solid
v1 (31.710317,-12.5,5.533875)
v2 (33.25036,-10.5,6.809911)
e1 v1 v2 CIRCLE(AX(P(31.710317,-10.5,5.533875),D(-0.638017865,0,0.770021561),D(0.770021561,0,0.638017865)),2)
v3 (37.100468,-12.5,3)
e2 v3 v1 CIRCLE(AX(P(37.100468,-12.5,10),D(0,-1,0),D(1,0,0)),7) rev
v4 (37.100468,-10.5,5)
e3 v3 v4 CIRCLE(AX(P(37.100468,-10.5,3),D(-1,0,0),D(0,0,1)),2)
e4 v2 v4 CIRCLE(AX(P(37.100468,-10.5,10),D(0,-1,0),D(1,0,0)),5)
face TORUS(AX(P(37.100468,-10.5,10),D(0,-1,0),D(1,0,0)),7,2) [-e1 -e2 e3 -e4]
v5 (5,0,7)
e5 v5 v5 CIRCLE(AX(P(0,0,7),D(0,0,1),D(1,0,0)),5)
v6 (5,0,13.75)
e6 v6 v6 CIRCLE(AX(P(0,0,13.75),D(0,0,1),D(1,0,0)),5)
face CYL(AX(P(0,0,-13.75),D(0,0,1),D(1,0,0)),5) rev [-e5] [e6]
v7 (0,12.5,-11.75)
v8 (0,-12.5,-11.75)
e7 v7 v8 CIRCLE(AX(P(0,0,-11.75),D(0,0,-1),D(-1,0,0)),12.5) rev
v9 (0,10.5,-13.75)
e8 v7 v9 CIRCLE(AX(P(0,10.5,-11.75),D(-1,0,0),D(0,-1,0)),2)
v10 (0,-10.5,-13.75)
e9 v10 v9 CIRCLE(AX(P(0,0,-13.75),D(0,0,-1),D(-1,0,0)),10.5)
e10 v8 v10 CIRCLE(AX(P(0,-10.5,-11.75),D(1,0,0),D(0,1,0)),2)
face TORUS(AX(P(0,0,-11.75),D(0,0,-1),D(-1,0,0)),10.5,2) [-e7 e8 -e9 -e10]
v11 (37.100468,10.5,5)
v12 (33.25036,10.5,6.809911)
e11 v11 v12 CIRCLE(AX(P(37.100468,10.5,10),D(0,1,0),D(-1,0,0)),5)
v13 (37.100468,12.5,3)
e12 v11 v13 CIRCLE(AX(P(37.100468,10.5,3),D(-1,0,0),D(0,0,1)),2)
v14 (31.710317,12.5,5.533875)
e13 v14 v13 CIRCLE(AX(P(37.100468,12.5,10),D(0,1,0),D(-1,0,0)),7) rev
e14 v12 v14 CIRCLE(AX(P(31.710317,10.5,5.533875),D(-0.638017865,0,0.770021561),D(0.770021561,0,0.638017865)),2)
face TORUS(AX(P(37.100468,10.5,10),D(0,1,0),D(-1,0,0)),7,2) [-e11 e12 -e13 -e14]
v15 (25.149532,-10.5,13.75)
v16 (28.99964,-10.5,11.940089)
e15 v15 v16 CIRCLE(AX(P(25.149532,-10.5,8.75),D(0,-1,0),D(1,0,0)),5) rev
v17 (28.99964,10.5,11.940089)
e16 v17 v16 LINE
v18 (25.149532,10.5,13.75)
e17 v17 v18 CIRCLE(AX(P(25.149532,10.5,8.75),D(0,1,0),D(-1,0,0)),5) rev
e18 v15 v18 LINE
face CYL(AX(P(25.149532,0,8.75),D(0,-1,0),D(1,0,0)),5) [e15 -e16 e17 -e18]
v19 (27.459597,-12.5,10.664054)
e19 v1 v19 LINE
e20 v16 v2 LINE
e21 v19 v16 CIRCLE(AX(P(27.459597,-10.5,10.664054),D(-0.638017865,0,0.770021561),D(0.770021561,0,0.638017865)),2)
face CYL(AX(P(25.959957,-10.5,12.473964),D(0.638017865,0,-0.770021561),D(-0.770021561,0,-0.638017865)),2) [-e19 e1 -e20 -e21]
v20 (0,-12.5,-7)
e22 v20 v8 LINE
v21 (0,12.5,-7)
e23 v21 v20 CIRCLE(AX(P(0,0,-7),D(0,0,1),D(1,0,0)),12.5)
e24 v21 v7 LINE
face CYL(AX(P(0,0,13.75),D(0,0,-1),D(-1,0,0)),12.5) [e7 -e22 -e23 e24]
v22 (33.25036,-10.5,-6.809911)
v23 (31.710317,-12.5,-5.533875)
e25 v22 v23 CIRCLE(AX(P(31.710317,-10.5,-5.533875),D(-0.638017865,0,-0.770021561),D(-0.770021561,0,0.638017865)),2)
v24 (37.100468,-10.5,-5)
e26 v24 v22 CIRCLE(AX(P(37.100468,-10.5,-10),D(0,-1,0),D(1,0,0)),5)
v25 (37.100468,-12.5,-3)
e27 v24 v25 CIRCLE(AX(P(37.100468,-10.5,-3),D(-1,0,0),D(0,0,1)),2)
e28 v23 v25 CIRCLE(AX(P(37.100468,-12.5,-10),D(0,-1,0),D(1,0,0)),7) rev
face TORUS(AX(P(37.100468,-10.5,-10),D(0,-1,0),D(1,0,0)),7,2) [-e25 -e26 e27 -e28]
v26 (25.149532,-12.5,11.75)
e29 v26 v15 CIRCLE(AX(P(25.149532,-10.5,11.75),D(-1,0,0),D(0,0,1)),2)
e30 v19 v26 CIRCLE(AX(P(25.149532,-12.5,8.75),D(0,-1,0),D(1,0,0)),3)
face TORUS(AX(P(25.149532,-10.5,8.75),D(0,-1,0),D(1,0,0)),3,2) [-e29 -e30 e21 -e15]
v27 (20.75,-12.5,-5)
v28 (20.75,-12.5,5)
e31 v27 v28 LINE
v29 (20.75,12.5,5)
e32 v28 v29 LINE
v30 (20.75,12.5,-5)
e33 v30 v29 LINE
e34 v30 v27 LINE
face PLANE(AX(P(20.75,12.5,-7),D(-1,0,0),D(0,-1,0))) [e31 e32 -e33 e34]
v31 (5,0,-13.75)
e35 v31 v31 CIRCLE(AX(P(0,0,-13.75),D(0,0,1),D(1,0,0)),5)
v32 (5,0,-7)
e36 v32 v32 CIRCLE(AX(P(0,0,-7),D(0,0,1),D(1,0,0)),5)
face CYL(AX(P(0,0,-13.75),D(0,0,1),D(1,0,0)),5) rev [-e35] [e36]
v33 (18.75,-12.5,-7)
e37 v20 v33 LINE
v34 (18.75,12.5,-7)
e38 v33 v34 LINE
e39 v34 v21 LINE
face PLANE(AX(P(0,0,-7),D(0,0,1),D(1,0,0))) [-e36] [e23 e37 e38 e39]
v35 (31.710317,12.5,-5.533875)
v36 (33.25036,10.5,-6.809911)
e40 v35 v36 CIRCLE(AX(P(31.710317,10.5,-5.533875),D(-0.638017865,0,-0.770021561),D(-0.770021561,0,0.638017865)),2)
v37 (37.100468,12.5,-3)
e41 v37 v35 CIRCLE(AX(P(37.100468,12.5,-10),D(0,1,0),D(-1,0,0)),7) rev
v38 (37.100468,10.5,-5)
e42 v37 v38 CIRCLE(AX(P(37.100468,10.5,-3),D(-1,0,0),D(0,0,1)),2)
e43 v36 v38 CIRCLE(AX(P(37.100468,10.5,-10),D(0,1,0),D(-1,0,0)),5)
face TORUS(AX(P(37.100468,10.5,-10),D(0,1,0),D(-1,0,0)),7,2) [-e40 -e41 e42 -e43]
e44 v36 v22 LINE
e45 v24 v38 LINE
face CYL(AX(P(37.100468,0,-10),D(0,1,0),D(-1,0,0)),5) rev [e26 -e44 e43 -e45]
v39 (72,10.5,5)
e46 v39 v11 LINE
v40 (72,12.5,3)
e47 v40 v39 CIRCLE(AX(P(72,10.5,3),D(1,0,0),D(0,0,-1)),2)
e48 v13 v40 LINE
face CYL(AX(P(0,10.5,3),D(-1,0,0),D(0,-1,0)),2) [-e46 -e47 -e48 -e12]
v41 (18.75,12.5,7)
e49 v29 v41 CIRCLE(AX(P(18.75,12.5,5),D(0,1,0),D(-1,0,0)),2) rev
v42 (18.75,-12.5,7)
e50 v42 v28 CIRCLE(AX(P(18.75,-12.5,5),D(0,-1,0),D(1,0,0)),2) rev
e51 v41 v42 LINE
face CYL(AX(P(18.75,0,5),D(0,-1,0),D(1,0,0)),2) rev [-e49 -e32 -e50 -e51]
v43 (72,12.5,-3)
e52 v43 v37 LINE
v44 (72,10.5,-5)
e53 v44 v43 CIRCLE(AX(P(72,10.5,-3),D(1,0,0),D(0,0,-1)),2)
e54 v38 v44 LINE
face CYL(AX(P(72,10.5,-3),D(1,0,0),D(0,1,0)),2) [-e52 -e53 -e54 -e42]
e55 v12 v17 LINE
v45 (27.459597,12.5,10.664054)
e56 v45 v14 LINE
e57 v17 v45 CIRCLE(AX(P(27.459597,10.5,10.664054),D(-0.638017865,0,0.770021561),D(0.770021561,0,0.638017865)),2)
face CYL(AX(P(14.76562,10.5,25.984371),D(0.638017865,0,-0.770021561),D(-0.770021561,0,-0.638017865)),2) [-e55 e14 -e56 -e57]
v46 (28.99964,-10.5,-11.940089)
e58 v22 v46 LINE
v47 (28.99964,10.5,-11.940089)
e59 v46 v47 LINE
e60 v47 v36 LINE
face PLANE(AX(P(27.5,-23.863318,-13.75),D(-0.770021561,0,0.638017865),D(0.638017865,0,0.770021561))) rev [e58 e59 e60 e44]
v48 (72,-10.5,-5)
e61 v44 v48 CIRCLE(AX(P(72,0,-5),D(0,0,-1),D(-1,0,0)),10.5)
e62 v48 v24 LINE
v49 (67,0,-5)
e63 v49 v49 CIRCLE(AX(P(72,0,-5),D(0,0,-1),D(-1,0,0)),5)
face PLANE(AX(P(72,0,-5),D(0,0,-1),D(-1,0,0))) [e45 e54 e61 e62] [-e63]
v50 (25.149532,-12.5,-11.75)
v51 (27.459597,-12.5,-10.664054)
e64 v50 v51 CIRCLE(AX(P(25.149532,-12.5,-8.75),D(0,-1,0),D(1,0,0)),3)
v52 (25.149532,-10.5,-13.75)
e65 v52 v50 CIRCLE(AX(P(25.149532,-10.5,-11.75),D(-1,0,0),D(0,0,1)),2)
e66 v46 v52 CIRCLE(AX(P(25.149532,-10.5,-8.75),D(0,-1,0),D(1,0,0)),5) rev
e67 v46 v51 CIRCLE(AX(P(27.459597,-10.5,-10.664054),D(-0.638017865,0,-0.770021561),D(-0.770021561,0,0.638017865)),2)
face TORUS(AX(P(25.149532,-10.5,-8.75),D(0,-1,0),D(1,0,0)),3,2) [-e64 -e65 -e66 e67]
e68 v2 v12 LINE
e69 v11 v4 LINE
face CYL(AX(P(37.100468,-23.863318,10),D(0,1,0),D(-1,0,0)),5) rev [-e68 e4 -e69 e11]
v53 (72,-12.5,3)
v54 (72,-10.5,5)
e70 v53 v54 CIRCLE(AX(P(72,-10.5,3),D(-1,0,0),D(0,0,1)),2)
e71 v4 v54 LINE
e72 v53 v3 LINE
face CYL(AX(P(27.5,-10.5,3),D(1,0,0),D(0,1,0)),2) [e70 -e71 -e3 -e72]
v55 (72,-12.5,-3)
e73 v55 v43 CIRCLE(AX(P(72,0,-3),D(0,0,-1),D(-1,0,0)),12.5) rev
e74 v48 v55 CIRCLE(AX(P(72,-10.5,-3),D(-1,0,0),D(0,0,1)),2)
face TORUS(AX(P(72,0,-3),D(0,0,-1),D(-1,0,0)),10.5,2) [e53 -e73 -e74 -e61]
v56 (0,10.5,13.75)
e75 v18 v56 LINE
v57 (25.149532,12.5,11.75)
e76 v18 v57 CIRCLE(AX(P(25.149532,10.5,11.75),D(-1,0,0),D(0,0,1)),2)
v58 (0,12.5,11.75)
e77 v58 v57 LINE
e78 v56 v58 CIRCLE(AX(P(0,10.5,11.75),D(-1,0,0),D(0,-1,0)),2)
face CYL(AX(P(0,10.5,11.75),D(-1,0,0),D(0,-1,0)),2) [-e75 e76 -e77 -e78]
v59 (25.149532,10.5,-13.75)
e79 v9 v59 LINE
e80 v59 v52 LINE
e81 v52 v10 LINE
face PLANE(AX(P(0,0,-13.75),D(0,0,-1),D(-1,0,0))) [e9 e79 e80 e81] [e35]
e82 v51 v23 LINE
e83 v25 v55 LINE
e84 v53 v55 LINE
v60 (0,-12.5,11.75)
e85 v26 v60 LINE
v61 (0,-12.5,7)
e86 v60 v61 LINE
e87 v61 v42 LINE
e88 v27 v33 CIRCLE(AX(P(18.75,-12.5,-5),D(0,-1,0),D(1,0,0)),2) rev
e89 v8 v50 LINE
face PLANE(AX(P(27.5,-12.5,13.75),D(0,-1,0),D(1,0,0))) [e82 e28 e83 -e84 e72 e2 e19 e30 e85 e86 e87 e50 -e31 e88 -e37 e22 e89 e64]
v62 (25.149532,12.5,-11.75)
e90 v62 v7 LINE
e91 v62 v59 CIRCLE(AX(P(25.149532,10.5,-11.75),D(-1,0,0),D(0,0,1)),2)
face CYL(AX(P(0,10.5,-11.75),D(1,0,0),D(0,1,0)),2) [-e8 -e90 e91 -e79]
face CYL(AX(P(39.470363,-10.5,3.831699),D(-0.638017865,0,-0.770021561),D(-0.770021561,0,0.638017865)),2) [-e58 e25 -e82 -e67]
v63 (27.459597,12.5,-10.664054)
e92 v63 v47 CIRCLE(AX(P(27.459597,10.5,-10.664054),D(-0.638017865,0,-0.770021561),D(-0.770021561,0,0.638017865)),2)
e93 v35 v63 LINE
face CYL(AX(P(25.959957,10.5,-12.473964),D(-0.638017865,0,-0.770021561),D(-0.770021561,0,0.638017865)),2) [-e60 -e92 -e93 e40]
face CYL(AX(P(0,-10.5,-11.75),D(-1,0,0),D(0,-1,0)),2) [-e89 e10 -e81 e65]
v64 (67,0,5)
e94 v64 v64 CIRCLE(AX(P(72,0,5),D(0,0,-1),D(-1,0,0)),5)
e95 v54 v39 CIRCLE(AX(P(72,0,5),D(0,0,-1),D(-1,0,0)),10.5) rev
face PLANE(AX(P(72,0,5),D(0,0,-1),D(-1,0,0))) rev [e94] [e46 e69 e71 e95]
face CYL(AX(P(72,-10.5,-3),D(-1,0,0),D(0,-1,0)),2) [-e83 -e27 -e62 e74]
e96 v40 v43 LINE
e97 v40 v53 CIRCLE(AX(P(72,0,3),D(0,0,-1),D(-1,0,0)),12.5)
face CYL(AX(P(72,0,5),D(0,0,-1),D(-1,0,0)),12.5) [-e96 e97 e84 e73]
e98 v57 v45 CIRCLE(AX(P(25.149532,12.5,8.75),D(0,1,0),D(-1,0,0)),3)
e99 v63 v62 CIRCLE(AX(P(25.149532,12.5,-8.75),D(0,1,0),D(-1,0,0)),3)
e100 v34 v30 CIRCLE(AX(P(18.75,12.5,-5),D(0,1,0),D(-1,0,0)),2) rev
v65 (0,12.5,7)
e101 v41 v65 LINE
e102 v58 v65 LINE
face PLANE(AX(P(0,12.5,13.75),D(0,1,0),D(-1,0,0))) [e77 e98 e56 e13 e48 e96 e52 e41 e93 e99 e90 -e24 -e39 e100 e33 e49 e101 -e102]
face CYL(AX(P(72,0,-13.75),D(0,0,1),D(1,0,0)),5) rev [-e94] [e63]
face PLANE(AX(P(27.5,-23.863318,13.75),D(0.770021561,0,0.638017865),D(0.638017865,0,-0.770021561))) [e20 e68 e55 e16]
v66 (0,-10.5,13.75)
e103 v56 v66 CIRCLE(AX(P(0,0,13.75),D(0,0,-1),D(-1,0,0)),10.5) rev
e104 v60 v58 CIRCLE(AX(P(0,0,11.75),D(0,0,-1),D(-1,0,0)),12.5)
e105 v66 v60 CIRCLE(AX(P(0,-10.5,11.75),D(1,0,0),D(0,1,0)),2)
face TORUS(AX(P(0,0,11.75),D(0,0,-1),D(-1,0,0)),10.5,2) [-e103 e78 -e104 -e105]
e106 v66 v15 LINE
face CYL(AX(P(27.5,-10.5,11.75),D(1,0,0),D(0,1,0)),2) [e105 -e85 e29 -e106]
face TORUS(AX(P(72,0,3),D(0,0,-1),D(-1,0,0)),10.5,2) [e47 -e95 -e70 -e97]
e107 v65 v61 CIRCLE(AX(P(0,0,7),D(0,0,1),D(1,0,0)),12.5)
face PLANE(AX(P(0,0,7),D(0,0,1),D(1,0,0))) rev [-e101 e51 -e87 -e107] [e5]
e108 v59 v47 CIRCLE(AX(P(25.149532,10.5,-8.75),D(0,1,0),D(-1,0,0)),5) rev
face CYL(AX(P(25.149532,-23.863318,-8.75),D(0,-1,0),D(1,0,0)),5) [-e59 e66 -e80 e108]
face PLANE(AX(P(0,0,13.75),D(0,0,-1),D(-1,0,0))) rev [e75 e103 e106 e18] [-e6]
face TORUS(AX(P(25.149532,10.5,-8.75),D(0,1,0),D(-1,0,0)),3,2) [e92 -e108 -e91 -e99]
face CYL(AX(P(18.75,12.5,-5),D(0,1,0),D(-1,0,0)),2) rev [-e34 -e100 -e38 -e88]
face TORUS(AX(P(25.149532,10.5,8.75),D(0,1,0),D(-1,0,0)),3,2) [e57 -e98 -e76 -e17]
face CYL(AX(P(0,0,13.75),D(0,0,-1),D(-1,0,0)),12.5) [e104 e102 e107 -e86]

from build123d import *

# Parameters (mm, degrees)
BASE_EXTRUDE_DEPTH  = 13.75
CUT_EXTRUDE1_DEPTH  = 7
BOSS_EXTRUDE1_DEPTH = 5
BOSS_EXTRUDE2_START = -25
BOSS_EXTRUDE2_DEPTH = 25
HOLE1_START         = -13.75
HOLE1_OUTLINE_R     = 5
HOLE1_DEPTH         = 27.5
LPATTERN1_COUNT     = 2
LPATTERN1_PITCH     = 72
FILLET1_R           = 5
FILLET2_R           = 5
FILLET3_R           = 2
FILLET4_R           = 2


# Read off the part's stored shape, not the designer's step: Hole1
with BuildPart() as part:
    # Sketch3 → Base-Extrude (new, symmetric)
    with BuildSketch(Plane.XY):
        with BuildLine():
            Line((0, 12.5), (27.5, 12.5))
            Line((27.5, 12.5), (27.5, -12.5))
            Line((27.5, -12.5), (0, -12.5))
            ThreePointArc((0, -12.5), (-12.5, 0), (0, 12.5))
        make_face()
    extrude(amount=BASE_EXTRUDE_DEPTH, both=True)

    # Sketch5 → Cut-Extrude1 (cut, symmetric)
    with BuildSketch(Plane.XY):
        with BuildLine():
            Line((20.75, 12.5), (20.75, -12.5))
            Line((20.75, -12.5), (0, -12.5))
            ThreePointArc((0, -12.5), (-12.5, 0), (0, 12.5))
            Line((0, 12.5), (20.75, 12.5))
        make_face()
    extrude(amount=CUT_EXTRUDE1_DEPTH, both=True, mode=Mode.SUBTRACT)

    # Sketch6 → Boss-Extrude1 (add, symmetric)
    with BuildSketch(Plane.XY):
        with BuildLine():
            Line((27.5, 12.5), (72, 12.5))
            ThreePointArc((72, 12.5), (84.5, 0), (72, -12.5))
            Line((72, -12.5), (27.5, -12.5))
            Line((27.5, -12.5), (27.5, 12.5))
        make_face()
    extrude(amount=BOSS_EXTRUDE1_DEPTH, both=True)

    # Sketch8 → Boss-Extrude2 (add)
    with BuildSketch(Plane(origin=(0, 12.5, 0), x_dir=(-1, 0, 0), z_dir=(0, 1, 0)).offset(BOSS_EXTRUDE2_START)):
        Polygon((-27.5, 13.75), (-27.5, 5), (-34.75, 5), align=None)
    boss_extrude2 = extrude(amount=BOSS_EXTRUDE2_DEPTH)

    # Mirror1: Boss-Extrude2 across plane
    add(boss_extrude2.mirror(Plane.XY))

    # Hole1 outline → Hole1 (cut)
    with BuildSketch(Plane.XY.offset(HOLE1_START)):
        Circle(HOLE1_OUTLINE_R)
    hole1 = extrude(amount=HOLE1_DEPTH, mode=Mode.SUBTRACT)

    # LPattern1: Hole1 ×2
    with Locations(*[(i * LPATTERN1_PITCH, 0, 0) for i in range(1, LPATTERN1_COUNT)]):
        add(hole1, mode=Mode.SUBTRACT)

    # Fillet1
    fillet1_edges = [part.edges().sort_by_distance(p)[0] for p in [
        (34.75, 0, 5),
        (34.75, 0, -5),
    ]]
    fillet(fillet1_edges, radius=FILLET1_R)

    # Fillet2
    fillet2_edges = [part.edges().sort_by_distance(p)[0] for p in [
        (27.5, 0, 13.75),
        (27.5, 0, -13.75),
    ]]
    fillet(fillet2_edges, radius=FILLET2_R)

    # Fillet3
    fillet3_edges = [part.edges().sort_by_distance(p)[0] for p in [
        (54.550233765, -12.5, 5),
        (84.5, 0, 5),
        (84.5, 0, -5),
        (54.550233765, -12.5, -5),
        (-12.5, 0, 13.75),
        (12.574766235, 12.5, -13.75),
        (-12.5, 0, -13.75),
        (12.574766235, 12.5, 13.75),
        (54.550233765, 12.5, 5),
        (54.550233765, 12.5, -5),
        (34.973315281, 12.5, 5.475044386),
        (34.973315281, -12.5, 5.475044386),
        (34.973315281, 12.5, -5.475044386),
        (34.973315281, -12.5, -5.475044386),
        (31.125, 12.5, -9.375),
        (31.125, -12.5, -9.375),
        (31.125, 12.5, 9.375),
        (27.276684719, 12.5, 13.274955614),
        (27.276684719, 12.5, -13.274955614),
        (12.574766235, -12.5, -13.75),
        (31.125, -12.5, 9.375),
        (12.574766235, -12.5, 13.75),
        (27.276684719, -12.5, 13.274955614),
        (27.276684719, -12.5, -13.274955614),
    ]]
    fillet(fillet3_edges, radius=FILLET3_R)

    # Fillet4
    fillet4_edges = [part.edges().sort_by_distance(p)[0] for p in [
        (20.75, 0, 7),
        (20.75, 0, -7),
    ]]
    fillet(fillet4_edges, radius=FILLET4_R)


solid = part.part
